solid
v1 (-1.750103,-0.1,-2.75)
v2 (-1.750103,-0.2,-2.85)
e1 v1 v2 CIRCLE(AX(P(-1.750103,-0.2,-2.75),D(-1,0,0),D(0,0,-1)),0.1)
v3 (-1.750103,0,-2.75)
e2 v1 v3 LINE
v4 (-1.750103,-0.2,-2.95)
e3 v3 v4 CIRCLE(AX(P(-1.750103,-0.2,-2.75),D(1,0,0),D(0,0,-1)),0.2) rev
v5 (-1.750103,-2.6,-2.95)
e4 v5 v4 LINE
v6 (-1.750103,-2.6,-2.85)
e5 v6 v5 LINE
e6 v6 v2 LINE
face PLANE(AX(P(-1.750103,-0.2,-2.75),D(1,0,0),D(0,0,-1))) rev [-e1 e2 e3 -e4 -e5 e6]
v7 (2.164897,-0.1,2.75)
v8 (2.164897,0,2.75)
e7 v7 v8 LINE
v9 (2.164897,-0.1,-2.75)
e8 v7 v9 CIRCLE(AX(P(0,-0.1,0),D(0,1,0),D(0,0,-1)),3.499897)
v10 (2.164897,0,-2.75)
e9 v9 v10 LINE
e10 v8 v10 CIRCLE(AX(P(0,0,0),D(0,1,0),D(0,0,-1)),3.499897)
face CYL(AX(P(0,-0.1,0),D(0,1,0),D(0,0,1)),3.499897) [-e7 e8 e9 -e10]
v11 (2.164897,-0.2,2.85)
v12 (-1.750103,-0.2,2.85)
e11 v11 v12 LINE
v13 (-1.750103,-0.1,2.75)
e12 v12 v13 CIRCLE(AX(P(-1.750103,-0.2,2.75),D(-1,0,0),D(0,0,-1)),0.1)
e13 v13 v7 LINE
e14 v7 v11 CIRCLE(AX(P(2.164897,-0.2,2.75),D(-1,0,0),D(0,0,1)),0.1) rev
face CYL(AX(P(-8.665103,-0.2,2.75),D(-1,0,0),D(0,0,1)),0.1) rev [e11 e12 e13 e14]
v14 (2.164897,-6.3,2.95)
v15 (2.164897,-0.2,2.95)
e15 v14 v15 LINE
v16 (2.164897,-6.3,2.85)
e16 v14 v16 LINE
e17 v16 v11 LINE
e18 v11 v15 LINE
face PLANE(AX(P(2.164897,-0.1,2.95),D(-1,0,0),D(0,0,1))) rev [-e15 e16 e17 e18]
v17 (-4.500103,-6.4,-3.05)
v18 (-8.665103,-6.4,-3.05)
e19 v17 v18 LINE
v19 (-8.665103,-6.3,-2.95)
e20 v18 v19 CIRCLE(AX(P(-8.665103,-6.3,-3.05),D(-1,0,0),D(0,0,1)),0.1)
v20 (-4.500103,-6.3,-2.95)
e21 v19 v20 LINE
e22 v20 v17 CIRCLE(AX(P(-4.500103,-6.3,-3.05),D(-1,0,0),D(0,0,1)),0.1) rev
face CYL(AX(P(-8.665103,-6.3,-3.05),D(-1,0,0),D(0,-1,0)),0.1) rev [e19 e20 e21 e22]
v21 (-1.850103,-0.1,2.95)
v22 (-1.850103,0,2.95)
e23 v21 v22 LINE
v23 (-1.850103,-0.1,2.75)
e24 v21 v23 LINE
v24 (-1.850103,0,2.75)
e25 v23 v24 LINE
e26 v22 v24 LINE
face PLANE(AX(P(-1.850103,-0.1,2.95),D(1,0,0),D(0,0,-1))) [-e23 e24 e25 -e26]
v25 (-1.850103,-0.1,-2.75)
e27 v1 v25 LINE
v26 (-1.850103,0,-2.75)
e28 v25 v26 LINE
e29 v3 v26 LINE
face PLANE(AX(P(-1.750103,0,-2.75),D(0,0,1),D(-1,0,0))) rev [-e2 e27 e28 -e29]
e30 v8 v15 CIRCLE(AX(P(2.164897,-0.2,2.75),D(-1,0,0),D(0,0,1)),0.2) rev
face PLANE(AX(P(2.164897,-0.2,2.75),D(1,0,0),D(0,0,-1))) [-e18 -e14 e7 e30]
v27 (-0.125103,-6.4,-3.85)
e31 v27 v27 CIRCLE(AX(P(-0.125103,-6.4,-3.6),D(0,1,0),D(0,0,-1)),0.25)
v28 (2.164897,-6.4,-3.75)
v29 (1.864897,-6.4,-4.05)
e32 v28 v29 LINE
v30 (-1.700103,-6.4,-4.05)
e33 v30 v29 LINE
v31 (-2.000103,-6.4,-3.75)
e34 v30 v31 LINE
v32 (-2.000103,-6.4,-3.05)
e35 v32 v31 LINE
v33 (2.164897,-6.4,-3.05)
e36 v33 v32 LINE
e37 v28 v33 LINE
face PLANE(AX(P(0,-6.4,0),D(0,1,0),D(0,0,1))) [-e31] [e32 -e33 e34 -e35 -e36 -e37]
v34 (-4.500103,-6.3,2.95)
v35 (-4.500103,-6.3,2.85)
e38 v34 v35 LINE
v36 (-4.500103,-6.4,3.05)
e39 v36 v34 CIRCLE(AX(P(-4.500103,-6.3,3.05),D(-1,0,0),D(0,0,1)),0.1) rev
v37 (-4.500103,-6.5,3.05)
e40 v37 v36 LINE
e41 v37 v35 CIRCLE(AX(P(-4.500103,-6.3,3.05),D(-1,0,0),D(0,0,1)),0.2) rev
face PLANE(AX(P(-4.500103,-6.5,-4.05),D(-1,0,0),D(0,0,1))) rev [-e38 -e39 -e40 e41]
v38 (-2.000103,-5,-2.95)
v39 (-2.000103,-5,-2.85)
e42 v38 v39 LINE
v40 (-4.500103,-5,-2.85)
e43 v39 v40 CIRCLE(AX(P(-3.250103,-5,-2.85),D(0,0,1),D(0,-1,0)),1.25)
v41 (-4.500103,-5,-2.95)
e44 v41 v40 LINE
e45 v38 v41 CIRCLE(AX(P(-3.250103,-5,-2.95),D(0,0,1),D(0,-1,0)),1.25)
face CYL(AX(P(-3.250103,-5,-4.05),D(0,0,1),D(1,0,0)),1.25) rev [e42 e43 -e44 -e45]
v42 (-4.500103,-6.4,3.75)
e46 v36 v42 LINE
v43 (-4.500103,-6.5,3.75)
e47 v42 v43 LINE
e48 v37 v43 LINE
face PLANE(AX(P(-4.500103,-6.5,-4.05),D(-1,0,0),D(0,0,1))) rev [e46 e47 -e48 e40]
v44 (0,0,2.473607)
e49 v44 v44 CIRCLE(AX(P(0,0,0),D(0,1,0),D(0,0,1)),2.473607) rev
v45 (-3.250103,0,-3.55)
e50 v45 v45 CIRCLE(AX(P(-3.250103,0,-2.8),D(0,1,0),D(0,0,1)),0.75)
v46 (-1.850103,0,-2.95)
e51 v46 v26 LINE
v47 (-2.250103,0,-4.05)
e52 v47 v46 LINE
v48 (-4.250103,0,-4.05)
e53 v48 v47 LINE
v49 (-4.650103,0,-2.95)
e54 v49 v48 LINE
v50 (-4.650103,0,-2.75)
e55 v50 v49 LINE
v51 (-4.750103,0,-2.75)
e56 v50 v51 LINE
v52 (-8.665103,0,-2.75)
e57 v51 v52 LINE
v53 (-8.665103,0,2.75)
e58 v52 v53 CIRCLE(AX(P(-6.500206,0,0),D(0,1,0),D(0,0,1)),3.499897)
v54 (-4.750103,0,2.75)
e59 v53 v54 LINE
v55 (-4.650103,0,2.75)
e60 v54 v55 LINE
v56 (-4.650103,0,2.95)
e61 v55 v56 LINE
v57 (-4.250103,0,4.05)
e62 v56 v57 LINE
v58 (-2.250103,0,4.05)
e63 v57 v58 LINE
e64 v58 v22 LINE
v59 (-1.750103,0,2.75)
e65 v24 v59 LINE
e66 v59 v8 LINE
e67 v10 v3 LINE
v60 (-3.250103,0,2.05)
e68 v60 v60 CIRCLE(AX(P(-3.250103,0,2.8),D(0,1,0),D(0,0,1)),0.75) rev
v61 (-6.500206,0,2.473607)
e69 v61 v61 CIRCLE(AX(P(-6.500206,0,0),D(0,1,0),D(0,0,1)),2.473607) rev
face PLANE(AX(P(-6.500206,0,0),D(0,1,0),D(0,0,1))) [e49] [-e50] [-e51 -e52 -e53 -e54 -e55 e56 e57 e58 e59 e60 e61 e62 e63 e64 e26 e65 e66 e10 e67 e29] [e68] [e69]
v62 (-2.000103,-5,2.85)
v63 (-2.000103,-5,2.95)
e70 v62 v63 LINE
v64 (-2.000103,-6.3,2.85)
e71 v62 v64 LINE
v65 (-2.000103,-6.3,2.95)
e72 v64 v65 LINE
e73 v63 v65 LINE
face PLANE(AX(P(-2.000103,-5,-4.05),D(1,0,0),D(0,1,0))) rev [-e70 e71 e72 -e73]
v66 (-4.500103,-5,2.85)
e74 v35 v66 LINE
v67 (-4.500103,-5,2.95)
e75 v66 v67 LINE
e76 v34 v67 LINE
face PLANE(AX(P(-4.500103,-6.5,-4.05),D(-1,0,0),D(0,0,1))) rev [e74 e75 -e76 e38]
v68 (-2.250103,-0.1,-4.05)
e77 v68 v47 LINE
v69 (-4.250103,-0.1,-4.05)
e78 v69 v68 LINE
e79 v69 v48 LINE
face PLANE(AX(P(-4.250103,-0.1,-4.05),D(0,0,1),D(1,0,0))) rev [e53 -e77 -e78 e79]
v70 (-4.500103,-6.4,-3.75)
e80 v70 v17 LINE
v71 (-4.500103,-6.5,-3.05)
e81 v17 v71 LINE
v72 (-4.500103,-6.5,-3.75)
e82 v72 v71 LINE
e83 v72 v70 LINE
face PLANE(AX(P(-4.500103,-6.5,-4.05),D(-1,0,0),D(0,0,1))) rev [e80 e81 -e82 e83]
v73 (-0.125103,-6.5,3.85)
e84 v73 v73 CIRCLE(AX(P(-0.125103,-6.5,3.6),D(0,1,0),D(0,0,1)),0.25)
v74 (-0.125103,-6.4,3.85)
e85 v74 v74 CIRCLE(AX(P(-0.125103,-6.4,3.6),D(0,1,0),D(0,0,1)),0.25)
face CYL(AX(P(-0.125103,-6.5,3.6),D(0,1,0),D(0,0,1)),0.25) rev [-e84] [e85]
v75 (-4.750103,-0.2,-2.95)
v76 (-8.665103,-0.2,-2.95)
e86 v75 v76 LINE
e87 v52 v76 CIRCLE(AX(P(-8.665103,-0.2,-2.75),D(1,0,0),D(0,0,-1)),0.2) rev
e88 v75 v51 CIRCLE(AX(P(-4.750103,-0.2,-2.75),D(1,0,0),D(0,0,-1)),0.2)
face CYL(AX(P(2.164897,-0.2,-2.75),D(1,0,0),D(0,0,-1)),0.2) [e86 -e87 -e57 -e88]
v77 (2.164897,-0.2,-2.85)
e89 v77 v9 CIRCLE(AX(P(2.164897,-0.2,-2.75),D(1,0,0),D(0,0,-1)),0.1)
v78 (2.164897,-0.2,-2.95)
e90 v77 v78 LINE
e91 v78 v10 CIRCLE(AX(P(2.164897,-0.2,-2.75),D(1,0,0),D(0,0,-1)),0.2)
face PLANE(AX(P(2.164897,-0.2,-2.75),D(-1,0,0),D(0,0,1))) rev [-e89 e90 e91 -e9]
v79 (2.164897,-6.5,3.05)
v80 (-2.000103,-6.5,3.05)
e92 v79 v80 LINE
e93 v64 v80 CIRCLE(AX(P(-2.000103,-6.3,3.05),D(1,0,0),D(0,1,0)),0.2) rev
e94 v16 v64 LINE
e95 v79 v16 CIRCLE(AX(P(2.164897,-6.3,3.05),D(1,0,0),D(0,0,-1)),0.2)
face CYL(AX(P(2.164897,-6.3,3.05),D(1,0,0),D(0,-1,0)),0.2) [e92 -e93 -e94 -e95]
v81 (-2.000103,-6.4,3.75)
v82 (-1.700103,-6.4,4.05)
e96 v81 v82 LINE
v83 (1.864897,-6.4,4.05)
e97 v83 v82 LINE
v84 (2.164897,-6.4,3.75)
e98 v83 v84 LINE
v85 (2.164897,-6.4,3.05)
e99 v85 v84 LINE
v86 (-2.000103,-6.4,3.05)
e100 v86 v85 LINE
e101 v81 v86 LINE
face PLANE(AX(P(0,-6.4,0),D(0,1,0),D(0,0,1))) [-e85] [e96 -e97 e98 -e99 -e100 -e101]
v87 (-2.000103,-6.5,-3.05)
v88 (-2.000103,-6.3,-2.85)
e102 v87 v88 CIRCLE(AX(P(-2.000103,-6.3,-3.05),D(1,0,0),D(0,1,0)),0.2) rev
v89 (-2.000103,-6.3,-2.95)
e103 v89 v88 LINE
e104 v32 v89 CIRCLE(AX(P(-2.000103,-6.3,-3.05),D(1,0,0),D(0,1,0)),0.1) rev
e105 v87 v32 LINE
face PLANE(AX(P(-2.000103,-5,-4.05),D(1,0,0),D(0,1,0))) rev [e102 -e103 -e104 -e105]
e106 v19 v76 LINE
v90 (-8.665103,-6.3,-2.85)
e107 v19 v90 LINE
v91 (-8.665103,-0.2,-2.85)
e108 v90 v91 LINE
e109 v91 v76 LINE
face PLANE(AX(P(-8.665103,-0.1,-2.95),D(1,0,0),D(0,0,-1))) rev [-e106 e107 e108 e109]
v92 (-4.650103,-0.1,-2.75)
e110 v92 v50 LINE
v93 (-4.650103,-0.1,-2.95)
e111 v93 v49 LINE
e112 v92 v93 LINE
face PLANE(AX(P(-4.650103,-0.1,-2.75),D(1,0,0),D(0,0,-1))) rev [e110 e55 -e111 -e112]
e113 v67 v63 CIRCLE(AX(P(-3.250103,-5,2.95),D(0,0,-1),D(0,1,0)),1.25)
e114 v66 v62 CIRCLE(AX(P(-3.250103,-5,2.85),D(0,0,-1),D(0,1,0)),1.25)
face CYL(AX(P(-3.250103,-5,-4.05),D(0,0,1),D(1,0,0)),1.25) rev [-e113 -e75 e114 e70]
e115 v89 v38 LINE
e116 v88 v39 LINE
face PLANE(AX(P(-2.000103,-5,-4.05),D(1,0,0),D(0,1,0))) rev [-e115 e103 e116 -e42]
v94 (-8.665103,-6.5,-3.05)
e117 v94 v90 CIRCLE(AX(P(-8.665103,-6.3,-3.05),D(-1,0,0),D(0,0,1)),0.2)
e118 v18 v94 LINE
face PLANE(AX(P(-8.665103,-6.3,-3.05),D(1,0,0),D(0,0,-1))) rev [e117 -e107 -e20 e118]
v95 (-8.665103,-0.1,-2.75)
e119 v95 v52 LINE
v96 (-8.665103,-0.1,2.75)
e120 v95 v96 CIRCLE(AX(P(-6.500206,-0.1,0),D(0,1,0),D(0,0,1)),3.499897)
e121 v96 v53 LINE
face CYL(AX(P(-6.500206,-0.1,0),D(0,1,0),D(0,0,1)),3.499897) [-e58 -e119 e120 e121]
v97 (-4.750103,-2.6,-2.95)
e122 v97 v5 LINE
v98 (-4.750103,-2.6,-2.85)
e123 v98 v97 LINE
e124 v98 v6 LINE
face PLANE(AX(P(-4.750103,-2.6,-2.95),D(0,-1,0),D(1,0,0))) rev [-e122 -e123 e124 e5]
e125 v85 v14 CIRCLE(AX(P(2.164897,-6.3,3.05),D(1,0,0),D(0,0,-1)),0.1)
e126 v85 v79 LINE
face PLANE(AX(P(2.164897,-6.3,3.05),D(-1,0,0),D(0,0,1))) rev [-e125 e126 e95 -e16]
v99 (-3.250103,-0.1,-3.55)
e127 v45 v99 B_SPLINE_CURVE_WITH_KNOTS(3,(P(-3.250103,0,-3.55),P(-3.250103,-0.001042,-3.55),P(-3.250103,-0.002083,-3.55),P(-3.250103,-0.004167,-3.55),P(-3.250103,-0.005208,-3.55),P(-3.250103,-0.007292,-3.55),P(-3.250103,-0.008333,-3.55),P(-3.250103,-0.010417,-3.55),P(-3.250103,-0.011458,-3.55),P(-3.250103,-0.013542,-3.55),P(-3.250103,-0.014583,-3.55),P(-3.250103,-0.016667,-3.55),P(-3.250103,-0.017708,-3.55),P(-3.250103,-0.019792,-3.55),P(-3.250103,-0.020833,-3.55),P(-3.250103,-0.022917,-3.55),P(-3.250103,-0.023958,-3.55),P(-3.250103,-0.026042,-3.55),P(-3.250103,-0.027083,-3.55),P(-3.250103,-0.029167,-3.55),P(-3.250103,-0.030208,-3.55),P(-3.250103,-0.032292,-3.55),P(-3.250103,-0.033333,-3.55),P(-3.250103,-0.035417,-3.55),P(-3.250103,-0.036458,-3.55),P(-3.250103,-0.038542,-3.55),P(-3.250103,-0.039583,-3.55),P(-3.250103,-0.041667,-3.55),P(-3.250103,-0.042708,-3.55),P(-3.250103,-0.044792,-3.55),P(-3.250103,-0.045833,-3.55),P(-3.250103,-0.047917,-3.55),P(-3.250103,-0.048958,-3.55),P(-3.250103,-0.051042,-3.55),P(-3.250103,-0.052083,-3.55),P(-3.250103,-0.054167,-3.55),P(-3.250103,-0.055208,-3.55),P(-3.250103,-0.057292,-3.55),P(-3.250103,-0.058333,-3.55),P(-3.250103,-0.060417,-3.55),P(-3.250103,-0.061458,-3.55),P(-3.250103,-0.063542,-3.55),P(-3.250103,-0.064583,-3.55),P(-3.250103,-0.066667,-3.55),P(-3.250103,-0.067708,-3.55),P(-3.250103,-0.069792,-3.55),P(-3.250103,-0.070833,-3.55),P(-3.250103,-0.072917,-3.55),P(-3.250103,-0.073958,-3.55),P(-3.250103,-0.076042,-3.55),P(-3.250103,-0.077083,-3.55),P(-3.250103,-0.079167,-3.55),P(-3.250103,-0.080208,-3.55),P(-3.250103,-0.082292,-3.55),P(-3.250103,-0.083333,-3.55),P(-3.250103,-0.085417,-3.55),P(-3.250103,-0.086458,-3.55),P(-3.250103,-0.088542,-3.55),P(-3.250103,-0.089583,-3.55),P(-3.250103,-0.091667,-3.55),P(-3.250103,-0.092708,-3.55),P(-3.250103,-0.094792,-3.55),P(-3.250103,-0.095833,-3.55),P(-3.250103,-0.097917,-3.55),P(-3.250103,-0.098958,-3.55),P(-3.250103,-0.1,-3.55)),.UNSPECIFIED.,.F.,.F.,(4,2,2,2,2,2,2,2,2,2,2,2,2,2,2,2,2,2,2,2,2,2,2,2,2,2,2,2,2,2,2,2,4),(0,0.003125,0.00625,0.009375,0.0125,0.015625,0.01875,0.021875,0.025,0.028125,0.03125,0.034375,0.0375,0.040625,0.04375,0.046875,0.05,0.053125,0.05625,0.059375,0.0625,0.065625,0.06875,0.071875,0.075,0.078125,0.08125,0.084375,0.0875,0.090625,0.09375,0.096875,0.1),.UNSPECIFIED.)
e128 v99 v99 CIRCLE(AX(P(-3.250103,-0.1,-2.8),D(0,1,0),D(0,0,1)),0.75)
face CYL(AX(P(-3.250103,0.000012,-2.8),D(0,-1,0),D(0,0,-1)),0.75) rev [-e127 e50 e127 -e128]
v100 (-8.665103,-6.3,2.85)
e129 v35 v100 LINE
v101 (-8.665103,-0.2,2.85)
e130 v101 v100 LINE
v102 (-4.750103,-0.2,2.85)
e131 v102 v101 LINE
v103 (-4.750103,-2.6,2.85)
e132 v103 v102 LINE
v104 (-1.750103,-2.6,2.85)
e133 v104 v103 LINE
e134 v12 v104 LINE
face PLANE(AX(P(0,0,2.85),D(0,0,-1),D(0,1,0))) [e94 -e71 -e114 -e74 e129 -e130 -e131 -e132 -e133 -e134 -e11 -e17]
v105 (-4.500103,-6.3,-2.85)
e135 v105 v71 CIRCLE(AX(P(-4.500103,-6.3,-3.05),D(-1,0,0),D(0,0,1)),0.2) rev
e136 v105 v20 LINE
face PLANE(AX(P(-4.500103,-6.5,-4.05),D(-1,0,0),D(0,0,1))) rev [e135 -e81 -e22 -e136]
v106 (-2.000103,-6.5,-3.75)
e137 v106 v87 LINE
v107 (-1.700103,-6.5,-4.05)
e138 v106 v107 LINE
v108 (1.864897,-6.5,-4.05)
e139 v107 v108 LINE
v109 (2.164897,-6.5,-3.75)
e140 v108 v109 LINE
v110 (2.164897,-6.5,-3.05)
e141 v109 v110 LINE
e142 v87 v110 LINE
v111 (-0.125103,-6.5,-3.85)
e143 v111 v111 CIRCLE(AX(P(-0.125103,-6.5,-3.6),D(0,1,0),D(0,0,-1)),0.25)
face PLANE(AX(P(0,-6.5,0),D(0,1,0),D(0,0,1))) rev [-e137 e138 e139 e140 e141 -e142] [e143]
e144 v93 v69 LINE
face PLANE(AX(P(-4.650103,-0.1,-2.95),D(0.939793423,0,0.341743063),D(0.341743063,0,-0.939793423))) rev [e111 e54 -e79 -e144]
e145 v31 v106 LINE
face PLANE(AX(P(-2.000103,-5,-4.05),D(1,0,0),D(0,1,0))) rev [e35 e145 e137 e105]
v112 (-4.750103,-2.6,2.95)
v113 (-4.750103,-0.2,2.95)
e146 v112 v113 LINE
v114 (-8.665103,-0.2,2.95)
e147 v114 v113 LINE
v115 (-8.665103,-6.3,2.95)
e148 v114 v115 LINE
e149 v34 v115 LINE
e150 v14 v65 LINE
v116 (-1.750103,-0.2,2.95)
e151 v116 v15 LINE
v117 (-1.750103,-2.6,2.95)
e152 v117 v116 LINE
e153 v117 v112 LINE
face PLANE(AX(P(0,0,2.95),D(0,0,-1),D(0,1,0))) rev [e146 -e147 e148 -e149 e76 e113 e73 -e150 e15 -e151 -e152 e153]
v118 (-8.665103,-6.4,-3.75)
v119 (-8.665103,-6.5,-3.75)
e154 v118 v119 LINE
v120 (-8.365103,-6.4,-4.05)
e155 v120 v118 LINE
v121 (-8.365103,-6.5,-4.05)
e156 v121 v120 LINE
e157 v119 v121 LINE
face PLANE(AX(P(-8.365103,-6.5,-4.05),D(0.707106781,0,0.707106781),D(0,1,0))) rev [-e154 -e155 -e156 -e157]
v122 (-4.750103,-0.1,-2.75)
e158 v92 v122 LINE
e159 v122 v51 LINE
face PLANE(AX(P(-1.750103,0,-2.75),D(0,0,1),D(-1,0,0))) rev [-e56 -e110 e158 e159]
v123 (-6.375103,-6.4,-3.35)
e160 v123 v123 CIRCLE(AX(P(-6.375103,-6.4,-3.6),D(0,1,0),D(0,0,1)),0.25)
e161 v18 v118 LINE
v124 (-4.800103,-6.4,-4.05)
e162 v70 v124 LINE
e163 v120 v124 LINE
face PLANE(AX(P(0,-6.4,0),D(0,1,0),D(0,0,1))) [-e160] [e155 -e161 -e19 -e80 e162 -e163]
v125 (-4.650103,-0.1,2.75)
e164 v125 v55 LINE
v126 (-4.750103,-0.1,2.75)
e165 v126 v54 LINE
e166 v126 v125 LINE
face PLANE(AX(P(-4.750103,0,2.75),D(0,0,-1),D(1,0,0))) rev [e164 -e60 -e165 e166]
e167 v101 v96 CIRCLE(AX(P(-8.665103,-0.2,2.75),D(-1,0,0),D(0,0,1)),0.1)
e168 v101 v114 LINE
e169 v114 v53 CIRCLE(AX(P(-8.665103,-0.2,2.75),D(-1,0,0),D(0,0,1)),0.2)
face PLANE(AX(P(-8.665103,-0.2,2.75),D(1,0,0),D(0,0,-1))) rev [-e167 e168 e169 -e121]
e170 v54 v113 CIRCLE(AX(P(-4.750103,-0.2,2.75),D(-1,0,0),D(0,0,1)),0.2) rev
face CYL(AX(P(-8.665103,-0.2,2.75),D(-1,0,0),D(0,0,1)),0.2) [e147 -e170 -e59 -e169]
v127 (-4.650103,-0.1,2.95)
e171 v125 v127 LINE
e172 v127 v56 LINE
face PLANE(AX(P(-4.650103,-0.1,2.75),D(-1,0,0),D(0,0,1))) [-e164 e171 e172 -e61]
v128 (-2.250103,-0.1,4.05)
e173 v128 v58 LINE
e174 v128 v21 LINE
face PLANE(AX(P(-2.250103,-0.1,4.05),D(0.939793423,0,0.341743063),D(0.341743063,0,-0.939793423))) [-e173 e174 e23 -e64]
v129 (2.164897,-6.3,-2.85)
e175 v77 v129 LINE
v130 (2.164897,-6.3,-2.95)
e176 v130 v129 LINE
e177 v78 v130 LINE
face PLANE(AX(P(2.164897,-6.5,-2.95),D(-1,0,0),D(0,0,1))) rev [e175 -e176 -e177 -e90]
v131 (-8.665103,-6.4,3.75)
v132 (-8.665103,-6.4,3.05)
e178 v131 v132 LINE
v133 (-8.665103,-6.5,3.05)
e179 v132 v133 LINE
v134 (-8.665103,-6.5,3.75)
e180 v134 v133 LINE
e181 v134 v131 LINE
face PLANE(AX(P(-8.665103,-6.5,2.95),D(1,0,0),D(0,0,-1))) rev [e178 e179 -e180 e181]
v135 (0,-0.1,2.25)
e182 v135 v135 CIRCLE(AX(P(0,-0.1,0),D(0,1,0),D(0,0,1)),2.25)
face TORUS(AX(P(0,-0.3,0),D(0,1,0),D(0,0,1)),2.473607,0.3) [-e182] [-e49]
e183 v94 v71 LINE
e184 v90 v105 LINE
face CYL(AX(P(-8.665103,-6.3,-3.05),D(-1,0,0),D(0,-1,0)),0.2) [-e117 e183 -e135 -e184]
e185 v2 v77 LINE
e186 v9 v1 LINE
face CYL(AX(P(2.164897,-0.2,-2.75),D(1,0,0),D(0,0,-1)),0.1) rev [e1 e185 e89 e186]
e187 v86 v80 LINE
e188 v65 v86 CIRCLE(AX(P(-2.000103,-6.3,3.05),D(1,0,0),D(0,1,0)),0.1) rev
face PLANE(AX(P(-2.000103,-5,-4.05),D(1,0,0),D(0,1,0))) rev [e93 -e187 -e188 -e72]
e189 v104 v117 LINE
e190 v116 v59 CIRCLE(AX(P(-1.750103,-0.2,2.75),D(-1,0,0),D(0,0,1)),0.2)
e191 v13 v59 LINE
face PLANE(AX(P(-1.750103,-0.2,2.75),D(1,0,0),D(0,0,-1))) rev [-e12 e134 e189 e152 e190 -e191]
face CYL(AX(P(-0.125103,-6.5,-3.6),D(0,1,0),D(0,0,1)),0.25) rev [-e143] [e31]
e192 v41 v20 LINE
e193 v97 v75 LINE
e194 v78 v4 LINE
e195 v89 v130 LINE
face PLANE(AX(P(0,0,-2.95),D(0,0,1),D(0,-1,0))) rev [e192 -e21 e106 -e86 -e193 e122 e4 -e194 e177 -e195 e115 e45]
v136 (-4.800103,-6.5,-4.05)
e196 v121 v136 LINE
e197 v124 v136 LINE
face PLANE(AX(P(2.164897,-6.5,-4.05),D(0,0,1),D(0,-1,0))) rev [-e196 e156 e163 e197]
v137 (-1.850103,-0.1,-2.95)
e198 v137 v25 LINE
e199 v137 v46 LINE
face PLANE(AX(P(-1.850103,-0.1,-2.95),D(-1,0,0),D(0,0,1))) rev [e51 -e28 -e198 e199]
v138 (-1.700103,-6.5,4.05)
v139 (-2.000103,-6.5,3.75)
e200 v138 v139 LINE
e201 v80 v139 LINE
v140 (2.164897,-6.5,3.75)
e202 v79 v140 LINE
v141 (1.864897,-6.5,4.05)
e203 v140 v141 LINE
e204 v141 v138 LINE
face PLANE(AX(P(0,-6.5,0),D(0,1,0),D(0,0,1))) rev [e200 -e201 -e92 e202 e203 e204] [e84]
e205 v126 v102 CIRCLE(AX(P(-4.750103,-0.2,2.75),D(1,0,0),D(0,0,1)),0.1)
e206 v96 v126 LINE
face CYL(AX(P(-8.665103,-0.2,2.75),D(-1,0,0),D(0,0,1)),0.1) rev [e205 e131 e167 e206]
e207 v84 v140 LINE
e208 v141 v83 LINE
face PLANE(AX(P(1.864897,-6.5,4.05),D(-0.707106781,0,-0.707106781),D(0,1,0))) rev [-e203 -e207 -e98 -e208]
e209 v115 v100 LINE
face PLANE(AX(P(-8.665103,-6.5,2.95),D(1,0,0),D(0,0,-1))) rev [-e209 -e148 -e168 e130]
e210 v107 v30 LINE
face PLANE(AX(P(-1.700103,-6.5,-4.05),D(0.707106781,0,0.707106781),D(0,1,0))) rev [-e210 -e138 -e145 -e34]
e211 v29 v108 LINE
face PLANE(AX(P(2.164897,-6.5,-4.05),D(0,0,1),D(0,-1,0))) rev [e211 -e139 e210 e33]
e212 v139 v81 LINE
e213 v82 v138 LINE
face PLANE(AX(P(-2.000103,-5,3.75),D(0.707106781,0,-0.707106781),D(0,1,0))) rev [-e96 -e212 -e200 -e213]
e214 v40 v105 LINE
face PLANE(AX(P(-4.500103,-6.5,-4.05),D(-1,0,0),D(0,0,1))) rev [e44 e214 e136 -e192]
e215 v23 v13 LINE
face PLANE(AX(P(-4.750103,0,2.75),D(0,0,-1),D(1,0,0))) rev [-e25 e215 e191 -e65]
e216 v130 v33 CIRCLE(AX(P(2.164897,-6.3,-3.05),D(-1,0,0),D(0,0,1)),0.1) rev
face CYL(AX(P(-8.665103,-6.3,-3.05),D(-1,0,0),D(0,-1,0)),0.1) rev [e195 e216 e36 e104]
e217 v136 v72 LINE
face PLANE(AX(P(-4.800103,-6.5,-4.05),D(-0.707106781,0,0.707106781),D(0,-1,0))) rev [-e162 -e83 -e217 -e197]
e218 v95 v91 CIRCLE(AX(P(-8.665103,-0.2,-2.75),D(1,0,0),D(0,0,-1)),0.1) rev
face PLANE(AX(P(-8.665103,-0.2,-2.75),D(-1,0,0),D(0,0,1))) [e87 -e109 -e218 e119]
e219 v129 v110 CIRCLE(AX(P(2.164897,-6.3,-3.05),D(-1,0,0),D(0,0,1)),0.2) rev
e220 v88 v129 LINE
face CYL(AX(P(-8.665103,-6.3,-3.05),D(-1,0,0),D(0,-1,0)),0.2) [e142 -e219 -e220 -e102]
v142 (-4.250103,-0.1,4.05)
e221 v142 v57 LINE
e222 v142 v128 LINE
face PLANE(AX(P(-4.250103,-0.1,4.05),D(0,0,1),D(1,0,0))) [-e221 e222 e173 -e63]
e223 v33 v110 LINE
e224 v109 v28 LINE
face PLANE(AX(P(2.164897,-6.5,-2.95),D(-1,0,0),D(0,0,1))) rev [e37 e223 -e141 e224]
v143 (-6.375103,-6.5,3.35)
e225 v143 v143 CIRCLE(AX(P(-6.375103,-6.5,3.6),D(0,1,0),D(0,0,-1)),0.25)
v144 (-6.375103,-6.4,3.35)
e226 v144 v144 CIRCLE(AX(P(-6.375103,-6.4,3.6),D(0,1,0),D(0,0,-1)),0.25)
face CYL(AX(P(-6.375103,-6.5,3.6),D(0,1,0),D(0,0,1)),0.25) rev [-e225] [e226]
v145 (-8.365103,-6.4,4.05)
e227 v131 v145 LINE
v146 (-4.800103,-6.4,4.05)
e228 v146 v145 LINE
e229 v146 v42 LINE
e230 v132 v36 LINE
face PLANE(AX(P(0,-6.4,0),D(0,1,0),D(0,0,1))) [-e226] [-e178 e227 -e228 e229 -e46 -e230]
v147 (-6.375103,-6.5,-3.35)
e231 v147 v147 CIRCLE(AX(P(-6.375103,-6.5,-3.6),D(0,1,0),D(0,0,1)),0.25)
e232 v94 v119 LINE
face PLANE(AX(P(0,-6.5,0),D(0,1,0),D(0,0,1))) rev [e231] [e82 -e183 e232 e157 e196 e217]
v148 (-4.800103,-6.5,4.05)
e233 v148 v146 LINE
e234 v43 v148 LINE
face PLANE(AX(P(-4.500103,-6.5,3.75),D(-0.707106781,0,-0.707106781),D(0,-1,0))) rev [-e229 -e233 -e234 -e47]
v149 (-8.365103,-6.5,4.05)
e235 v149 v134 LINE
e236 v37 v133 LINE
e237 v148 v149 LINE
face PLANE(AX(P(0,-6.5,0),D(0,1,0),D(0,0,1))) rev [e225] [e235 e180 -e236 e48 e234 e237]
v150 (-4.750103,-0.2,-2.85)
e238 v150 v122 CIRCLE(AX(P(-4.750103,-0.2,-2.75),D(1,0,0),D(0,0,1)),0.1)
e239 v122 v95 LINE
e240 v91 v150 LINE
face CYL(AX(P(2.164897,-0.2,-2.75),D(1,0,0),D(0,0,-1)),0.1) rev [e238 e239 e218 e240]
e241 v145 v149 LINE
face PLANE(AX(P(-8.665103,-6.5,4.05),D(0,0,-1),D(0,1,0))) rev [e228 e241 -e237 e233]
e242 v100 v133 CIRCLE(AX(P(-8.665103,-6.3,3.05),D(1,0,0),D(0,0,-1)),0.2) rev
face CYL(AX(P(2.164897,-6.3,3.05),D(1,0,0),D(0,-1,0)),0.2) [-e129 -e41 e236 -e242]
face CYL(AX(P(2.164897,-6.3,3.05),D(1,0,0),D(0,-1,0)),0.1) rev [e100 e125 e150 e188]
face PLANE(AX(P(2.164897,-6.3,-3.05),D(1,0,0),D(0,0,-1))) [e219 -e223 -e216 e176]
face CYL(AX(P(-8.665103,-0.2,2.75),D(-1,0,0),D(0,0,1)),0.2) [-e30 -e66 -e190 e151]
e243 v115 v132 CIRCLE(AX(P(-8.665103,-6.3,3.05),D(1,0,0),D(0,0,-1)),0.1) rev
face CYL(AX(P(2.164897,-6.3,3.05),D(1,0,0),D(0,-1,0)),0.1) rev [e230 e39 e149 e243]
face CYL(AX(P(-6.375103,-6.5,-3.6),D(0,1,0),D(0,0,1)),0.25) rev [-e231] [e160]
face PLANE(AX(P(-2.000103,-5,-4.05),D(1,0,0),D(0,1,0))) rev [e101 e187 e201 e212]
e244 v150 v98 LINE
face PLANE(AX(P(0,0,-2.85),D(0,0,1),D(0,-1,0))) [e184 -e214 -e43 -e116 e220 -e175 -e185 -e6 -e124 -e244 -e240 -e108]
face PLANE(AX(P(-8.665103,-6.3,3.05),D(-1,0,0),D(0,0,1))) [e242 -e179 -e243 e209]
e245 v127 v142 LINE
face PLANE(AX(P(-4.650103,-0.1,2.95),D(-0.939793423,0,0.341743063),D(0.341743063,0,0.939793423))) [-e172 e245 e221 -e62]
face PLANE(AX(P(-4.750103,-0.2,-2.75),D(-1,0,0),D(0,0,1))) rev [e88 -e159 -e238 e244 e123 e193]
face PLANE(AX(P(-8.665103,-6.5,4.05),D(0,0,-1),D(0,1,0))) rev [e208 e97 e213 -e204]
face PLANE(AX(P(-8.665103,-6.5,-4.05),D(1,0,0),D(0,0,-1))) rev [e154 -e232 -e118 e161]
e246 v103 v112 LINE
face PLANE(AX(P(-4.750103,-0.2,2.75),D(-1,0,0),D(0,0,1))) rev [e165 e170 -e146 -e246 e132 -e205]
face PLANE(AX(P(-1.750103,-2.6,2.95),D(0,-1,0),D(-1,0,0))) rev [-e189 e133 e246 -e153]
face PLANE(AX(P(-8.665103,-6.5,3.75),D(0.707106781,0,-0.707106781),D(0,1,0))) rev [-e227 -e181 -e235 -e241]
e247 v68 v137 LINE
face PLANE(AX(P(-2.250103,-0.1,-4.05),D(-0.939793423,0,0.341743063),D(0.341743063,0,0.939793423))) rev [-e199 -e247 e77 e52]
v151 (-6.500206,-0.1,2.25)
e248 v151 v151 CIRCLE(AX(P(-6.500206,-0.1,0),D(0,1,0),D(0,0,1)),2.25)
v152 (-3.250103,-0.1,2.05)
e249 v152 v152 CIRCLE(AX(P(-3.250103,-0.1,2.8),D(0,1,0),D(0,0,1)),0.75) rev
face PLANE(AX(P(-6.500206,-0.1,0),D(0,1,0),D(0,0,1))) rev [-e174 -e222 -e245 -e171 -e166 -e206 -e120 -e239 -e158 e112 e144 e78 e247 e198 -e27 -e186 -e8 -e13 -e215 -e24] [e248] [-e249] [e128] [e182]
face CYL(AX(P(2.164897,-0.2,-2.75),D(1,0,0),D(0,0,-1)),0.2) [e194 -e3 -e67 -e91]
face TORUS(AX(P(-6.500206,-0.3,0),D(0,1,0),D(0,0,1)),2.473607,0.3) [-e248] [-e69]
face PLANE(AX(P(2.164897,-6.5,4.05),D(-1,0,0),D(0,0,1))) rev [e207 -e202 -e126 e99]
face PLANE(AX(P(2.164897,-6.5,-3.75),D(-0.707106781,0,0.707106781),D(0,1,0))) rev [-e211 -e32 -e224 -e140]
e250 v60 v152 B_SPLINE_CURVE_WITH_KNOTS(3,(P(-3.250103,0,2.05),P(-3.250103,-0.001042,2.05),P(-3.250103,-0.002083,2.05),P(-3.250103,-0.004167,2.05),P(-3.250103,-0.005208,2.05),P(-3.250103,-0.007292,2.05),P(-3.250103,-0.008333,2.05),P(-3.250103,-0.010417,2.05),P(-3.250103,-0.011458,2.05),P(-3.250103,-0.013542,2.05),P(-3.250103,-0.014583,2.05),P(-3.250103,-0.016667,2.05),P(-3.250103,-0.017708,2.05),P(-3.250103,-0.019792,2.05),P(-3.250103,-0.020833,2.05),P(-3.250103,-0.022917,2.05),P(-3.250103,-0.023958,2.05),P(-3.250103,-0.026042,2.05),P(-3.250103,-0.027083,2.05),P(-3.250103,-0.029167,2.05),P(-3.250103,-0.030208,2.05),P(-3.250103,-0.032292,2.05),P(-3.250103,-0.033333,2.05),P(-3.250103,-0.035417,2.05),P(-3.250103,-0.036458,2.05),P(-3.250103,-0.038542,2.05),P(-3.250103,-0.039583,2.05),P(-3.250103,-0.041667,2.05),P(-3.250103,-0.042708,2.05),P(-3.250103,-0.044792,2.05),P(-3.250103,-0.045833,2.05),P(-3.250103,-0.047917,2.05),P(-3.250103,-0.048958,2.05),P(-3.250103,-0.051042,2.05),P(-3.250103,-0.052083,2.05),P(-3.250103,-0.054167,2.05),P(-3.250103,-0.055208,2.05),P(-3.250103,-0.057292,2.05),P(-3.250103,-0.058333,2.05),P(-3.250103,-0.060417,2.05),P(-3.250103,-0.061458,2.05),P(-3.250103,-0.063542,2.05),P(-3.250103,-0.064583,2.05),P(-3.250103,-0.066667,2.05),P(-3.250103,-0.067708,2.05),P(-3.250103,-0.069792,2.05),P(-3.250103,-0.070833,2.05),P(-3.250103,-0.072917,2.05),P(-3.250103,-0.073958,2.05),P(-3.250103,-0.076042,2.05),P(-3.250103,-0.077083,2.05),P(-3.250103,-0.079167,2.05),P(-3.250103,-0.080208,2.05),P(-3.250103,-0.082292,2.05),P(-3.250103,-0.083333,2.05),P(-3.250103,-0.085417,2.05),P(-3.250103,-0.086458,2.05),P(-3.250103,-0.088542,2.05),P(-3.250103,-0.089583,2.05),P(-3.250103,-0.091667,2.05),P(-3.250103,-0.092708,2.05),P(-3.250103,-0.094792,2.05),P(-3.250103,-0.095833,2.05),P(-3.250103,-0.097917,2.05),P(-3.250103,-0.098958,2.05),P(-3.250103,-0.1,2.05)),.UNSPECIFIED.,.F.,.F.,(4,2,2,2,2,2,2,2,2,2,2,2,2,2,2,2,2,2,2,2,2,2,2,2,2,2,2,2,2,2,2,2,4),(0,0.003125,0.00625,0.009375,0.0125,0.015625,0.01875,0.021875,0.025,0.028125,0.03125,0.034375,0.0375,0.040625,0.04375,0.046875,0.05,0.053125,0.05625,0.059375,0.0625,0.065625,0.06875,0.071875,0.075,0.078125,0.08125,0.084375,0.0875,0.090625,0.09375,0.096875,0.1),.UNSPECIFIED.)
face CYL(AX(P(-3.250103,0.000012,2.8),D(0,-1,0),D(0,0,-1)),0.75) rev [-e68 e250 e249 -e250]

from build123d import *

# Parameters (mm, degrees)
SKETCH1_R                      = 2.25
BASE_FLANGE1_DEPTH             = 0.1
EDGE_FLANGE1_STRIP_W           = 0.6
EDGE_FLANGE1_STRIP_H           = 0.1
EDGE_FLANGE1_STRIP_CUT_DEPTH   = 10.83
EDGE_FLANGE1_STRIP_2_W         = 0.6
EDGE_FLANGE1_STRIP_2_H         = 0.1
EDGE_FLANGE1_STRIP_CUT_2_DEPTH = 10.83
EDGE_FLANGE1_DEPTH             = 10.83
EDGE_FLANGE1_BEND_DEPTH        = 10.83
EDGE_FLANGE2_STRIP_W           = 0.6
EDGE_FLANGE2_STRIP_H           = 0.1
EDGE_FLANGE2_STRIP_CUT_DEPTH   = 10.83
EDGE_FLANGE2_STRIP_2_W         = 0.6
EDGE_FLANGE2_STRIP_2_H         = 0.1
EDGE_FLANGE2_STRIP_CUT_2_DEPTH = 10.83
EDGE_FLANGE2_DEPTH             = 10.83
EDGE_FLANGE2_BEND_DEPTH        = 10.83
CUT_EXTRUDE1_DEPTH             = 13.595815176
CUT_EXTRUDE1_DEPTH_BACK        = 13.595815176
CUT_EXTRUDE2_START             = -2.6
CUT_EXTRUDE2_OUTLINE_W         = 3
CUT_EXTRUDE2_OUTLINE_H         = 0.2
CUT_EXTRUDE2_DEPTH             = 2.6
TAB1_DEPTH                     = 0.1
CUT_EXTRUDE3_REACH             = 14.596
SKETCH23_R                     = 0.75
CUT_EXTRUDE3_DIRECTION_2_DEPTH = 13.595815176
BREAK_CORNER1_START            = -6.5
BREAK_CORNER1_DEPTH            = 0.1
FILLET1_R                      = 0.3
SKETCH24_R                     = 0.25
CUT_EXTRUDE4_DEPTH             = 10


# Read off the part's stored shape, not the designer's step: Cut-Extrude2, Break-Corner1
# Sheet-metal steps are written as plain solids
with BuildPart() as part:
    # Sketch1 → Base-Flange1 (new body)
    with BuildSketch(Plane(origin=(0, 0, 0), x_dir=(1, 0, 0), z_dir=(0, 1, 0))):
        with BuildLine():
            Line((-8.665102996, -2.95), (2.164897004, -2.95))
            Line((2.164897004, -2.95), (2.164897004, -2.75))
            ThreePointArc((2.164897004, -2.75), (3.499897004, 0), (2.164897004, 2.75))
            Line((2.164897004, 2.75), (2.164897004, 2.95))
            Line((2.164897004, 2.95), (-8.665102996, 2.95))
            Line((-8.665102996, 2.95), (-8.665102996, 2.75))
            ThreePointArc((-8.665102996, 2.75), (-10.000102996, 0), (-8.665102996, -2.75))
            Line((-8.665102996, -2.75), (-8.665102996, -2.95))
        make_face()
        with Locations(Location((0, 0, 0), (0, 0, 270))):
            Circle(SKETCH1_R, mode=Mode.SUBTRACT)
        with Locations(Location((-6.500205993, 0, 0), (0, 0, 270))):
            Circle(SKETCH1_R, mode=Mode.SUBTRACT)
    extrude(amount=-BASE_FLANGE1_DEPTH)

    # Edge-Flange1 strip (across the edge) → Edge-Flange1 strip cut (cut)
    with BuildSketch(Plane(origin=(2.164897004, -0.1, 2.95), x_dir=(0, 0, -1), z_dir=(-1, 0, 0))):
        with Locations((-0.1, -0.05)):
            Rectangle(EDGE_FLANGE1_STRIP_W, EDGE_FLANGE1_STRIP_H)
    extrude(amount=EDGE_FLANGE1_STRIP_CUT_DEPTH, mode=Mode.SUBTRACT)

    # Edge-Flange1 strip 2 (across the edge) → Edge-Flange1 strip cut 2 (cut)
    with BuildSketch(Plane(origin=(-8.665102996, -0.1, -2.95), x_dir=(0, 0, 1), z_dir=(1, 0, 0))):
        with Locations((-0.1, -0.05)):
            Rectangle(EDGE_FLANGE1_STRIP_2_W, EDGE_FLANGE1_STRIP_2_H)
    extrude(amount=EDGE_FLANGE1_STRIP_CUT_2_DEPTH, mode=Mode.SUBTRACT)

    # Edge-Flange1 section (across the edge) → Edge-Flange1 (add)
    with BuildSketch(Plane(origin=(2.164897004, -0.1, 2.95), x_dir=(0, 0, -1), z_dir=(-1, 0, 0))):
        with BuildLine():
            Line((0, 0.1), (0, 6.4))
            Line((0, 6.4), (0.1, 6.4))
            Line((0.1, 6.4), (0.1, 0.1))
            ThreePointArc((0.1, 0.1), (0.129289322, 0.029289322), (0.2, 0))
            Line((0.2, 0), (0.2, -0.1))
            ThreePointArc((0.2, -0.1), (0.058578644, -0.041421356), (0, 0.1))
        make_face()
    extrude(amount=EDGE_FLANGE1_DEPTH)

    # Edge-Flange1 section 2 (across the edge) → Edge-Flange1 bend (add)
    with BuildSketch(Plane(origin=(-8.665102996, -0.1, -2.95), x_dir=(0, 0, 1), z_dir=(1, 0, 0))):
        with BuildLine():
            Line((0, 0.1), (0, 6.4))
            Line((0, 6.4), (0.1, 6.4))
            Line((0.1, 6.4), (0.1, 0.1))
            ThreePointArc((0.1, 0.1), (0.129289322, 0.029289322), (0.2, 0))
            Line((0.2, 0), (0.2, -0.1))
            ThreePointArc((0.2, -0.1), (0.058578644, -0.041421356), (0, 0.1))
        make_face()
    extrude(amount=EDGE_FLANGE1_BEND_DEPTH)

    # Edge-Flange2 strip (across the edge) → Edge-Flange2 strip cut (cut)
    with BuildSketch(Plane(origin=(-8.665102996, -6.5, 2.95), x_dir=(0, 1, 0), z_dir=(1, 0, 0))):
        with Locations((-0.1, -0.05)):
            Rectangle(EDGE_FLANGE2_STRIP_W, EDGE_FLANGE2_STRIP_H)
    extrude(amount=EDGE_FLANGE2_STRIP_CUT_DEPTH, mode=Mode.SUBTRACT)

    # Edge-Flange2 strip 2 (across the edge) → Edge-Flange2 strip cut 2 (cut)
    with BuildSketch(Plane(origin=(2.164897004, -6.5, -2.95), x_dir=(0, 1, 0), z_dir=(-1, 0, 0))):
        with Locations((-0.1, -0.05)):
            Rectangle(EDGE_FLANGE2_STRIP_2_W, EDGE_FLANGE2_STRIP_2_H)
    extrude(amount=EDGE_FLANGE2_STRIP_CUT_2_DEPTH, mode=Mode.SUBTRACT)

    # Edge-Flange2 section (across the edge) → Edge-Flange2 (add)
    with BuildSketch(Plane(origin=(-8.665102996, -6.5, 2.95), x_dir=(0, 1, 0), z_dir=(1, 0, 0))):
        with BuildLine():
            Line((0, 0.1), (0, 1.1))
            Line((0, 1.1), (0.1, 1.1))
            Line((0.1, 1.1), (0.1, 0.1))
            ThreePointArc((0.1, 0.1), (0.129289322, 0.029289322), (0.2, 0))
            Line((0.2, 0), (0.2, -0.1))
            ThreePointArc((0.2, -0.1), (0.058578644, -0.041421356), (0, 0.1))
        make_face()
    extrude(amount=EDGE_FLANGE2_DEPTH)

    # Edge-Flange2 section 2 (across the edge) → Edge-Flange2 bend (add)
    with BuildSketch(Plane(origin=(2.164897004, -6.5, -2.95), x_dir=(0, 1, 0), z_dir=(-1, 0, 0))):
        with BuildLine():
            Line((0, 0.1), (0, 1.1))
            Line((0, 1.1), (0.1, 1.1))
            Line((0.1, 1.1), (0.1, 0.1))
            ThreePointArc((0.1, 0.1), (0.129289322, 0.029289322), (0.2, 0))
            Line((0.2, 0), (0.2, -0.1))
            ThreePointArc((0.2, -0.1), (0.058578644, -0.041421356), (0, 0.1))
        make_face()
    extrude(amount=EDGE_FLANGE2_BEND_DEPTH)

    # Sketch18 → Cut-Extrude1 (cut, two sides: drawn at the far end of the back side and taken through both)
    with BuildSketch(Plane.XY.offset(-CUT_EXTRUDE1_DEPTH_BACK)):
        with BuildLine():
            Line((-4.500102996, -6.5), (-4.500102996, -5))
            ThreePointArc((-4.500102996, -5), (-3.250102996, -3.75), (-2.000102996, -5))
            Line((-2.000102996, -5), (-2.000102996, -6.5))
            Line((-2.000102996, -6.5), (-4.500102996, -6.5))
        make_face()
    extrude(amount=CUT_EXTRUDE1_DEPTH + CUT_EXTRUDE1_DEPTH_BACK, mode=Mode.SUBTRACT)

    # Cut-Extrude2 outline → Cut-Extrude2 (cut)
    with BuildSketch(Plane(origin=(0, 0, 0), x_dir=(1, 0, 0), z_dir=(0, 1, 0)).offset(CUT_EXTRUDE2_START)):
        with Locations((-3.250102996, 2.85)):
            Rectangle(CUT_EXTRUDE2_OUTLINE_W, CUT_EXTRUDE2_OUTLINE_H)
        with Locations((-3.250102996, -2.85)):
            Rectangle(CUT_EXTRUDE2_OUTLINE_W, CUT_EXTRUDE2_OUTLINE_H)
    extrude(amount=CUT_EXTRUDE2_DEPTH, mode=Mode.SUBTRACT)

    # Sketch20 → Tab1 (add)
    with BuildSketch(Plane(origin=(0, 0, 0), x_dir=(1, 0, 0), z_dir=(0, 1, 0))):
        Polygon((-4.650102996, -2.75), (-4.650102996, -2.95), (-4.250102996, -4.05), (-2.250102996, -4.05), (-1.850102996, -2.95), (-1.850102996, -2.75), align=None)
    tab1 = extrude(amount=-TAB1_DEPTH)

    # Sketch23 → Cut-Extrude3 (cut, up to next)
    with BuildSketch(Plane(origin=(0, 0, 0), x_dir=(1, 0, 0), z_dir=(0, 1, 0)), mode=Mode.PRIVATE) as cut_extrude3_sk1:
        with Locations(Location((-3.250102996, -2.8, 0), (0, 0, 90))):
            Circle(SKETCH23_R)
    cut_extrude3_tool1 = extrude(cut_extrude3_sk1.sketch, amount=-CUT_EXTRUDE3_REACH, mode=Mode.PRIVATE) & part.part
    cut_extrude3 = cut_extrude3_tool1.solids().sort_by_distance((-3.250103, 0, 2.8))[0]
    add(cut_extrude3, mode=Mode.SUBTRACT)

    # Sketch23 → Cut-Extrude3 direction 2 (cut)
    with BuildSketch(Plane(origin=(0, 0, 0), x_dir=(1, 0, 0), z_dir=(0, 1, 0))):
        with Locations(Location((-3.250102996, -2.8, 0), (0, 0, 90))):
            Circle(SKETCH23_R)
    cut_extrude3_direction_2 = extrude(amount=CUT_EXTRUDE3_DIRECTION_2_DEPTH, mode=Mode.SUBTRACT)

    # Mirror1: Tab1, Cut-Extrude3, Cut-Extrude3 direction 2 across plane
    add(tab1.mirror(Plane.XY))
    add(cut_extrude3.mirror(Plane.XY), mode=Mode.SUBTRACT)
    add(cut_extrude3_direction_2.mirror(Plane.XY), mode=Mode.SUBTRACT)

    # Break-Corner1 outline → Break-Corner1 (cut)
    with BuildSketch(Plane(origin=(0, 0, 0), x_dir=(1, 0, 0), z_dir=(0, 1, 0)).offset(BREAK_CORNER1_START)):
        Polygon((-2.000102996, -4.05), (-1.700102996, -4.05), (-2.000102996, -3.75), align=None)
        Polygon((2.164897004, -3.75), (1.864897004, -4.05), (2.164897004, -4.05), align=None)
        Polygon((-4.500102996, -4.05), (-4.500102996, -3.75), (-4.800102996, -4.05), align=None)
        Polygon((-8.665102996, -4.05), (-8.365102996, -4.05), (-8.665102996, -3.75), align=None)
        Polygon((-2.000102996, 4.05), (-2.000102996, 3.75), (-1.700102996, 4.05), align=None)
        Polygon((2.164897004, 4.05), (1.864897004, 4.05), (2.164897004, 3.75), align=None)
        Polygon((-4.500102996, 4.05), (-4.800102996, 4.05), (-4.500102996, 3.75), align=None)
        Polygon((-8.665102996, 3.75), (-8.365102996, 4.05), (-8.665102996, 4.05), align=None)
    extrude(amount=BREAK_CORNER1_DEPTH, mode=Mode.SUBTRACT)

    # Fillet1
    # the kernel refuses this fillet: 0.3 mm, written as the material it takes off along each edge
    with BuildSketch(Plane(origin=(0, 0, 0), x_dir=(0, 0, 1), z_dir=(-1, 0, 0))) as fillet1_piece_1:
        with BuildLine():
            CenterArc((2.473606798, -0.3), FILLET1_R, 90, 48.189685104)
            Line((2.25, -0.1), (2.245527864, -0.096))
            ThreePointArc((2.245527864, -0.096), (2.244, -0.05), (2.244, 0))
            Line((2.244, 0), (2.25, 0.006))
            Line((2.25, 0.006), (2.473606798, 0.006))
            Line((2.473606798, 0.006), (2.473606798, 0))
        make_face()
    revolve(axis=Axis((0, 0, 0), (0, 1, 0)), mode=Mode.SUBTRACT)
    with BuildSketch(Plane(origin=(-6.500205993, 0, 0), x_dir=(0, 0, 1), z_dir=(-1, 0, 0))) as fillet1_piece_2:
        with BuildLine():
            CenterArc((2.473606798, -0.3), FILLET1_R, 90, 48.189685104)
            Line((2.25, -0.1), (2.245527864, -0.096))
            ThreePointArc((2.245527864, -0.096), (2.244, -0.05), (2.244, 0))
            Line((2.244, 0), (2.25, 0.006))
            Line((2.25, 0.006), (2.473606798, 0.006))
            Line((2.473606798, 0.006), (2.473606798, 0))
        make_face()
    revolve(axis=Axis((-6.500205993, 0, 0), (0, 1, 0)), mode=Mode.SUBTRACT)

    # Sketch24 → Cut-Extrude4 (cut)
    with BuildSketch(Plane(origin=(0, -6.4, 0), x_dir=(1, 0, 0), z_dir=(0, 1, 0))):
        with Locations(Location((-6.375102996, 3.6, 0), (0, 0, 270))):
            Circle(SKETCH24_R)
        with Locations(Location((-0.125102996, 3.6, 0), (0, 0, 90))):
            Circle(SKETCH24_R)
        with Locations(Location((-0.125102996, -3.6, 0), (0, 0, 270))):
            Circle(SKETCH24_R)
        with Locations(Location((-6.375102996, -3.6, 0), (0, 0, 90))):
            Circle(SKETCH24_R)
    extrude(amount=-CUT_EXTRUDE4_DEPTH, mode=Mode.SUBTRACT)


solid = part.part
